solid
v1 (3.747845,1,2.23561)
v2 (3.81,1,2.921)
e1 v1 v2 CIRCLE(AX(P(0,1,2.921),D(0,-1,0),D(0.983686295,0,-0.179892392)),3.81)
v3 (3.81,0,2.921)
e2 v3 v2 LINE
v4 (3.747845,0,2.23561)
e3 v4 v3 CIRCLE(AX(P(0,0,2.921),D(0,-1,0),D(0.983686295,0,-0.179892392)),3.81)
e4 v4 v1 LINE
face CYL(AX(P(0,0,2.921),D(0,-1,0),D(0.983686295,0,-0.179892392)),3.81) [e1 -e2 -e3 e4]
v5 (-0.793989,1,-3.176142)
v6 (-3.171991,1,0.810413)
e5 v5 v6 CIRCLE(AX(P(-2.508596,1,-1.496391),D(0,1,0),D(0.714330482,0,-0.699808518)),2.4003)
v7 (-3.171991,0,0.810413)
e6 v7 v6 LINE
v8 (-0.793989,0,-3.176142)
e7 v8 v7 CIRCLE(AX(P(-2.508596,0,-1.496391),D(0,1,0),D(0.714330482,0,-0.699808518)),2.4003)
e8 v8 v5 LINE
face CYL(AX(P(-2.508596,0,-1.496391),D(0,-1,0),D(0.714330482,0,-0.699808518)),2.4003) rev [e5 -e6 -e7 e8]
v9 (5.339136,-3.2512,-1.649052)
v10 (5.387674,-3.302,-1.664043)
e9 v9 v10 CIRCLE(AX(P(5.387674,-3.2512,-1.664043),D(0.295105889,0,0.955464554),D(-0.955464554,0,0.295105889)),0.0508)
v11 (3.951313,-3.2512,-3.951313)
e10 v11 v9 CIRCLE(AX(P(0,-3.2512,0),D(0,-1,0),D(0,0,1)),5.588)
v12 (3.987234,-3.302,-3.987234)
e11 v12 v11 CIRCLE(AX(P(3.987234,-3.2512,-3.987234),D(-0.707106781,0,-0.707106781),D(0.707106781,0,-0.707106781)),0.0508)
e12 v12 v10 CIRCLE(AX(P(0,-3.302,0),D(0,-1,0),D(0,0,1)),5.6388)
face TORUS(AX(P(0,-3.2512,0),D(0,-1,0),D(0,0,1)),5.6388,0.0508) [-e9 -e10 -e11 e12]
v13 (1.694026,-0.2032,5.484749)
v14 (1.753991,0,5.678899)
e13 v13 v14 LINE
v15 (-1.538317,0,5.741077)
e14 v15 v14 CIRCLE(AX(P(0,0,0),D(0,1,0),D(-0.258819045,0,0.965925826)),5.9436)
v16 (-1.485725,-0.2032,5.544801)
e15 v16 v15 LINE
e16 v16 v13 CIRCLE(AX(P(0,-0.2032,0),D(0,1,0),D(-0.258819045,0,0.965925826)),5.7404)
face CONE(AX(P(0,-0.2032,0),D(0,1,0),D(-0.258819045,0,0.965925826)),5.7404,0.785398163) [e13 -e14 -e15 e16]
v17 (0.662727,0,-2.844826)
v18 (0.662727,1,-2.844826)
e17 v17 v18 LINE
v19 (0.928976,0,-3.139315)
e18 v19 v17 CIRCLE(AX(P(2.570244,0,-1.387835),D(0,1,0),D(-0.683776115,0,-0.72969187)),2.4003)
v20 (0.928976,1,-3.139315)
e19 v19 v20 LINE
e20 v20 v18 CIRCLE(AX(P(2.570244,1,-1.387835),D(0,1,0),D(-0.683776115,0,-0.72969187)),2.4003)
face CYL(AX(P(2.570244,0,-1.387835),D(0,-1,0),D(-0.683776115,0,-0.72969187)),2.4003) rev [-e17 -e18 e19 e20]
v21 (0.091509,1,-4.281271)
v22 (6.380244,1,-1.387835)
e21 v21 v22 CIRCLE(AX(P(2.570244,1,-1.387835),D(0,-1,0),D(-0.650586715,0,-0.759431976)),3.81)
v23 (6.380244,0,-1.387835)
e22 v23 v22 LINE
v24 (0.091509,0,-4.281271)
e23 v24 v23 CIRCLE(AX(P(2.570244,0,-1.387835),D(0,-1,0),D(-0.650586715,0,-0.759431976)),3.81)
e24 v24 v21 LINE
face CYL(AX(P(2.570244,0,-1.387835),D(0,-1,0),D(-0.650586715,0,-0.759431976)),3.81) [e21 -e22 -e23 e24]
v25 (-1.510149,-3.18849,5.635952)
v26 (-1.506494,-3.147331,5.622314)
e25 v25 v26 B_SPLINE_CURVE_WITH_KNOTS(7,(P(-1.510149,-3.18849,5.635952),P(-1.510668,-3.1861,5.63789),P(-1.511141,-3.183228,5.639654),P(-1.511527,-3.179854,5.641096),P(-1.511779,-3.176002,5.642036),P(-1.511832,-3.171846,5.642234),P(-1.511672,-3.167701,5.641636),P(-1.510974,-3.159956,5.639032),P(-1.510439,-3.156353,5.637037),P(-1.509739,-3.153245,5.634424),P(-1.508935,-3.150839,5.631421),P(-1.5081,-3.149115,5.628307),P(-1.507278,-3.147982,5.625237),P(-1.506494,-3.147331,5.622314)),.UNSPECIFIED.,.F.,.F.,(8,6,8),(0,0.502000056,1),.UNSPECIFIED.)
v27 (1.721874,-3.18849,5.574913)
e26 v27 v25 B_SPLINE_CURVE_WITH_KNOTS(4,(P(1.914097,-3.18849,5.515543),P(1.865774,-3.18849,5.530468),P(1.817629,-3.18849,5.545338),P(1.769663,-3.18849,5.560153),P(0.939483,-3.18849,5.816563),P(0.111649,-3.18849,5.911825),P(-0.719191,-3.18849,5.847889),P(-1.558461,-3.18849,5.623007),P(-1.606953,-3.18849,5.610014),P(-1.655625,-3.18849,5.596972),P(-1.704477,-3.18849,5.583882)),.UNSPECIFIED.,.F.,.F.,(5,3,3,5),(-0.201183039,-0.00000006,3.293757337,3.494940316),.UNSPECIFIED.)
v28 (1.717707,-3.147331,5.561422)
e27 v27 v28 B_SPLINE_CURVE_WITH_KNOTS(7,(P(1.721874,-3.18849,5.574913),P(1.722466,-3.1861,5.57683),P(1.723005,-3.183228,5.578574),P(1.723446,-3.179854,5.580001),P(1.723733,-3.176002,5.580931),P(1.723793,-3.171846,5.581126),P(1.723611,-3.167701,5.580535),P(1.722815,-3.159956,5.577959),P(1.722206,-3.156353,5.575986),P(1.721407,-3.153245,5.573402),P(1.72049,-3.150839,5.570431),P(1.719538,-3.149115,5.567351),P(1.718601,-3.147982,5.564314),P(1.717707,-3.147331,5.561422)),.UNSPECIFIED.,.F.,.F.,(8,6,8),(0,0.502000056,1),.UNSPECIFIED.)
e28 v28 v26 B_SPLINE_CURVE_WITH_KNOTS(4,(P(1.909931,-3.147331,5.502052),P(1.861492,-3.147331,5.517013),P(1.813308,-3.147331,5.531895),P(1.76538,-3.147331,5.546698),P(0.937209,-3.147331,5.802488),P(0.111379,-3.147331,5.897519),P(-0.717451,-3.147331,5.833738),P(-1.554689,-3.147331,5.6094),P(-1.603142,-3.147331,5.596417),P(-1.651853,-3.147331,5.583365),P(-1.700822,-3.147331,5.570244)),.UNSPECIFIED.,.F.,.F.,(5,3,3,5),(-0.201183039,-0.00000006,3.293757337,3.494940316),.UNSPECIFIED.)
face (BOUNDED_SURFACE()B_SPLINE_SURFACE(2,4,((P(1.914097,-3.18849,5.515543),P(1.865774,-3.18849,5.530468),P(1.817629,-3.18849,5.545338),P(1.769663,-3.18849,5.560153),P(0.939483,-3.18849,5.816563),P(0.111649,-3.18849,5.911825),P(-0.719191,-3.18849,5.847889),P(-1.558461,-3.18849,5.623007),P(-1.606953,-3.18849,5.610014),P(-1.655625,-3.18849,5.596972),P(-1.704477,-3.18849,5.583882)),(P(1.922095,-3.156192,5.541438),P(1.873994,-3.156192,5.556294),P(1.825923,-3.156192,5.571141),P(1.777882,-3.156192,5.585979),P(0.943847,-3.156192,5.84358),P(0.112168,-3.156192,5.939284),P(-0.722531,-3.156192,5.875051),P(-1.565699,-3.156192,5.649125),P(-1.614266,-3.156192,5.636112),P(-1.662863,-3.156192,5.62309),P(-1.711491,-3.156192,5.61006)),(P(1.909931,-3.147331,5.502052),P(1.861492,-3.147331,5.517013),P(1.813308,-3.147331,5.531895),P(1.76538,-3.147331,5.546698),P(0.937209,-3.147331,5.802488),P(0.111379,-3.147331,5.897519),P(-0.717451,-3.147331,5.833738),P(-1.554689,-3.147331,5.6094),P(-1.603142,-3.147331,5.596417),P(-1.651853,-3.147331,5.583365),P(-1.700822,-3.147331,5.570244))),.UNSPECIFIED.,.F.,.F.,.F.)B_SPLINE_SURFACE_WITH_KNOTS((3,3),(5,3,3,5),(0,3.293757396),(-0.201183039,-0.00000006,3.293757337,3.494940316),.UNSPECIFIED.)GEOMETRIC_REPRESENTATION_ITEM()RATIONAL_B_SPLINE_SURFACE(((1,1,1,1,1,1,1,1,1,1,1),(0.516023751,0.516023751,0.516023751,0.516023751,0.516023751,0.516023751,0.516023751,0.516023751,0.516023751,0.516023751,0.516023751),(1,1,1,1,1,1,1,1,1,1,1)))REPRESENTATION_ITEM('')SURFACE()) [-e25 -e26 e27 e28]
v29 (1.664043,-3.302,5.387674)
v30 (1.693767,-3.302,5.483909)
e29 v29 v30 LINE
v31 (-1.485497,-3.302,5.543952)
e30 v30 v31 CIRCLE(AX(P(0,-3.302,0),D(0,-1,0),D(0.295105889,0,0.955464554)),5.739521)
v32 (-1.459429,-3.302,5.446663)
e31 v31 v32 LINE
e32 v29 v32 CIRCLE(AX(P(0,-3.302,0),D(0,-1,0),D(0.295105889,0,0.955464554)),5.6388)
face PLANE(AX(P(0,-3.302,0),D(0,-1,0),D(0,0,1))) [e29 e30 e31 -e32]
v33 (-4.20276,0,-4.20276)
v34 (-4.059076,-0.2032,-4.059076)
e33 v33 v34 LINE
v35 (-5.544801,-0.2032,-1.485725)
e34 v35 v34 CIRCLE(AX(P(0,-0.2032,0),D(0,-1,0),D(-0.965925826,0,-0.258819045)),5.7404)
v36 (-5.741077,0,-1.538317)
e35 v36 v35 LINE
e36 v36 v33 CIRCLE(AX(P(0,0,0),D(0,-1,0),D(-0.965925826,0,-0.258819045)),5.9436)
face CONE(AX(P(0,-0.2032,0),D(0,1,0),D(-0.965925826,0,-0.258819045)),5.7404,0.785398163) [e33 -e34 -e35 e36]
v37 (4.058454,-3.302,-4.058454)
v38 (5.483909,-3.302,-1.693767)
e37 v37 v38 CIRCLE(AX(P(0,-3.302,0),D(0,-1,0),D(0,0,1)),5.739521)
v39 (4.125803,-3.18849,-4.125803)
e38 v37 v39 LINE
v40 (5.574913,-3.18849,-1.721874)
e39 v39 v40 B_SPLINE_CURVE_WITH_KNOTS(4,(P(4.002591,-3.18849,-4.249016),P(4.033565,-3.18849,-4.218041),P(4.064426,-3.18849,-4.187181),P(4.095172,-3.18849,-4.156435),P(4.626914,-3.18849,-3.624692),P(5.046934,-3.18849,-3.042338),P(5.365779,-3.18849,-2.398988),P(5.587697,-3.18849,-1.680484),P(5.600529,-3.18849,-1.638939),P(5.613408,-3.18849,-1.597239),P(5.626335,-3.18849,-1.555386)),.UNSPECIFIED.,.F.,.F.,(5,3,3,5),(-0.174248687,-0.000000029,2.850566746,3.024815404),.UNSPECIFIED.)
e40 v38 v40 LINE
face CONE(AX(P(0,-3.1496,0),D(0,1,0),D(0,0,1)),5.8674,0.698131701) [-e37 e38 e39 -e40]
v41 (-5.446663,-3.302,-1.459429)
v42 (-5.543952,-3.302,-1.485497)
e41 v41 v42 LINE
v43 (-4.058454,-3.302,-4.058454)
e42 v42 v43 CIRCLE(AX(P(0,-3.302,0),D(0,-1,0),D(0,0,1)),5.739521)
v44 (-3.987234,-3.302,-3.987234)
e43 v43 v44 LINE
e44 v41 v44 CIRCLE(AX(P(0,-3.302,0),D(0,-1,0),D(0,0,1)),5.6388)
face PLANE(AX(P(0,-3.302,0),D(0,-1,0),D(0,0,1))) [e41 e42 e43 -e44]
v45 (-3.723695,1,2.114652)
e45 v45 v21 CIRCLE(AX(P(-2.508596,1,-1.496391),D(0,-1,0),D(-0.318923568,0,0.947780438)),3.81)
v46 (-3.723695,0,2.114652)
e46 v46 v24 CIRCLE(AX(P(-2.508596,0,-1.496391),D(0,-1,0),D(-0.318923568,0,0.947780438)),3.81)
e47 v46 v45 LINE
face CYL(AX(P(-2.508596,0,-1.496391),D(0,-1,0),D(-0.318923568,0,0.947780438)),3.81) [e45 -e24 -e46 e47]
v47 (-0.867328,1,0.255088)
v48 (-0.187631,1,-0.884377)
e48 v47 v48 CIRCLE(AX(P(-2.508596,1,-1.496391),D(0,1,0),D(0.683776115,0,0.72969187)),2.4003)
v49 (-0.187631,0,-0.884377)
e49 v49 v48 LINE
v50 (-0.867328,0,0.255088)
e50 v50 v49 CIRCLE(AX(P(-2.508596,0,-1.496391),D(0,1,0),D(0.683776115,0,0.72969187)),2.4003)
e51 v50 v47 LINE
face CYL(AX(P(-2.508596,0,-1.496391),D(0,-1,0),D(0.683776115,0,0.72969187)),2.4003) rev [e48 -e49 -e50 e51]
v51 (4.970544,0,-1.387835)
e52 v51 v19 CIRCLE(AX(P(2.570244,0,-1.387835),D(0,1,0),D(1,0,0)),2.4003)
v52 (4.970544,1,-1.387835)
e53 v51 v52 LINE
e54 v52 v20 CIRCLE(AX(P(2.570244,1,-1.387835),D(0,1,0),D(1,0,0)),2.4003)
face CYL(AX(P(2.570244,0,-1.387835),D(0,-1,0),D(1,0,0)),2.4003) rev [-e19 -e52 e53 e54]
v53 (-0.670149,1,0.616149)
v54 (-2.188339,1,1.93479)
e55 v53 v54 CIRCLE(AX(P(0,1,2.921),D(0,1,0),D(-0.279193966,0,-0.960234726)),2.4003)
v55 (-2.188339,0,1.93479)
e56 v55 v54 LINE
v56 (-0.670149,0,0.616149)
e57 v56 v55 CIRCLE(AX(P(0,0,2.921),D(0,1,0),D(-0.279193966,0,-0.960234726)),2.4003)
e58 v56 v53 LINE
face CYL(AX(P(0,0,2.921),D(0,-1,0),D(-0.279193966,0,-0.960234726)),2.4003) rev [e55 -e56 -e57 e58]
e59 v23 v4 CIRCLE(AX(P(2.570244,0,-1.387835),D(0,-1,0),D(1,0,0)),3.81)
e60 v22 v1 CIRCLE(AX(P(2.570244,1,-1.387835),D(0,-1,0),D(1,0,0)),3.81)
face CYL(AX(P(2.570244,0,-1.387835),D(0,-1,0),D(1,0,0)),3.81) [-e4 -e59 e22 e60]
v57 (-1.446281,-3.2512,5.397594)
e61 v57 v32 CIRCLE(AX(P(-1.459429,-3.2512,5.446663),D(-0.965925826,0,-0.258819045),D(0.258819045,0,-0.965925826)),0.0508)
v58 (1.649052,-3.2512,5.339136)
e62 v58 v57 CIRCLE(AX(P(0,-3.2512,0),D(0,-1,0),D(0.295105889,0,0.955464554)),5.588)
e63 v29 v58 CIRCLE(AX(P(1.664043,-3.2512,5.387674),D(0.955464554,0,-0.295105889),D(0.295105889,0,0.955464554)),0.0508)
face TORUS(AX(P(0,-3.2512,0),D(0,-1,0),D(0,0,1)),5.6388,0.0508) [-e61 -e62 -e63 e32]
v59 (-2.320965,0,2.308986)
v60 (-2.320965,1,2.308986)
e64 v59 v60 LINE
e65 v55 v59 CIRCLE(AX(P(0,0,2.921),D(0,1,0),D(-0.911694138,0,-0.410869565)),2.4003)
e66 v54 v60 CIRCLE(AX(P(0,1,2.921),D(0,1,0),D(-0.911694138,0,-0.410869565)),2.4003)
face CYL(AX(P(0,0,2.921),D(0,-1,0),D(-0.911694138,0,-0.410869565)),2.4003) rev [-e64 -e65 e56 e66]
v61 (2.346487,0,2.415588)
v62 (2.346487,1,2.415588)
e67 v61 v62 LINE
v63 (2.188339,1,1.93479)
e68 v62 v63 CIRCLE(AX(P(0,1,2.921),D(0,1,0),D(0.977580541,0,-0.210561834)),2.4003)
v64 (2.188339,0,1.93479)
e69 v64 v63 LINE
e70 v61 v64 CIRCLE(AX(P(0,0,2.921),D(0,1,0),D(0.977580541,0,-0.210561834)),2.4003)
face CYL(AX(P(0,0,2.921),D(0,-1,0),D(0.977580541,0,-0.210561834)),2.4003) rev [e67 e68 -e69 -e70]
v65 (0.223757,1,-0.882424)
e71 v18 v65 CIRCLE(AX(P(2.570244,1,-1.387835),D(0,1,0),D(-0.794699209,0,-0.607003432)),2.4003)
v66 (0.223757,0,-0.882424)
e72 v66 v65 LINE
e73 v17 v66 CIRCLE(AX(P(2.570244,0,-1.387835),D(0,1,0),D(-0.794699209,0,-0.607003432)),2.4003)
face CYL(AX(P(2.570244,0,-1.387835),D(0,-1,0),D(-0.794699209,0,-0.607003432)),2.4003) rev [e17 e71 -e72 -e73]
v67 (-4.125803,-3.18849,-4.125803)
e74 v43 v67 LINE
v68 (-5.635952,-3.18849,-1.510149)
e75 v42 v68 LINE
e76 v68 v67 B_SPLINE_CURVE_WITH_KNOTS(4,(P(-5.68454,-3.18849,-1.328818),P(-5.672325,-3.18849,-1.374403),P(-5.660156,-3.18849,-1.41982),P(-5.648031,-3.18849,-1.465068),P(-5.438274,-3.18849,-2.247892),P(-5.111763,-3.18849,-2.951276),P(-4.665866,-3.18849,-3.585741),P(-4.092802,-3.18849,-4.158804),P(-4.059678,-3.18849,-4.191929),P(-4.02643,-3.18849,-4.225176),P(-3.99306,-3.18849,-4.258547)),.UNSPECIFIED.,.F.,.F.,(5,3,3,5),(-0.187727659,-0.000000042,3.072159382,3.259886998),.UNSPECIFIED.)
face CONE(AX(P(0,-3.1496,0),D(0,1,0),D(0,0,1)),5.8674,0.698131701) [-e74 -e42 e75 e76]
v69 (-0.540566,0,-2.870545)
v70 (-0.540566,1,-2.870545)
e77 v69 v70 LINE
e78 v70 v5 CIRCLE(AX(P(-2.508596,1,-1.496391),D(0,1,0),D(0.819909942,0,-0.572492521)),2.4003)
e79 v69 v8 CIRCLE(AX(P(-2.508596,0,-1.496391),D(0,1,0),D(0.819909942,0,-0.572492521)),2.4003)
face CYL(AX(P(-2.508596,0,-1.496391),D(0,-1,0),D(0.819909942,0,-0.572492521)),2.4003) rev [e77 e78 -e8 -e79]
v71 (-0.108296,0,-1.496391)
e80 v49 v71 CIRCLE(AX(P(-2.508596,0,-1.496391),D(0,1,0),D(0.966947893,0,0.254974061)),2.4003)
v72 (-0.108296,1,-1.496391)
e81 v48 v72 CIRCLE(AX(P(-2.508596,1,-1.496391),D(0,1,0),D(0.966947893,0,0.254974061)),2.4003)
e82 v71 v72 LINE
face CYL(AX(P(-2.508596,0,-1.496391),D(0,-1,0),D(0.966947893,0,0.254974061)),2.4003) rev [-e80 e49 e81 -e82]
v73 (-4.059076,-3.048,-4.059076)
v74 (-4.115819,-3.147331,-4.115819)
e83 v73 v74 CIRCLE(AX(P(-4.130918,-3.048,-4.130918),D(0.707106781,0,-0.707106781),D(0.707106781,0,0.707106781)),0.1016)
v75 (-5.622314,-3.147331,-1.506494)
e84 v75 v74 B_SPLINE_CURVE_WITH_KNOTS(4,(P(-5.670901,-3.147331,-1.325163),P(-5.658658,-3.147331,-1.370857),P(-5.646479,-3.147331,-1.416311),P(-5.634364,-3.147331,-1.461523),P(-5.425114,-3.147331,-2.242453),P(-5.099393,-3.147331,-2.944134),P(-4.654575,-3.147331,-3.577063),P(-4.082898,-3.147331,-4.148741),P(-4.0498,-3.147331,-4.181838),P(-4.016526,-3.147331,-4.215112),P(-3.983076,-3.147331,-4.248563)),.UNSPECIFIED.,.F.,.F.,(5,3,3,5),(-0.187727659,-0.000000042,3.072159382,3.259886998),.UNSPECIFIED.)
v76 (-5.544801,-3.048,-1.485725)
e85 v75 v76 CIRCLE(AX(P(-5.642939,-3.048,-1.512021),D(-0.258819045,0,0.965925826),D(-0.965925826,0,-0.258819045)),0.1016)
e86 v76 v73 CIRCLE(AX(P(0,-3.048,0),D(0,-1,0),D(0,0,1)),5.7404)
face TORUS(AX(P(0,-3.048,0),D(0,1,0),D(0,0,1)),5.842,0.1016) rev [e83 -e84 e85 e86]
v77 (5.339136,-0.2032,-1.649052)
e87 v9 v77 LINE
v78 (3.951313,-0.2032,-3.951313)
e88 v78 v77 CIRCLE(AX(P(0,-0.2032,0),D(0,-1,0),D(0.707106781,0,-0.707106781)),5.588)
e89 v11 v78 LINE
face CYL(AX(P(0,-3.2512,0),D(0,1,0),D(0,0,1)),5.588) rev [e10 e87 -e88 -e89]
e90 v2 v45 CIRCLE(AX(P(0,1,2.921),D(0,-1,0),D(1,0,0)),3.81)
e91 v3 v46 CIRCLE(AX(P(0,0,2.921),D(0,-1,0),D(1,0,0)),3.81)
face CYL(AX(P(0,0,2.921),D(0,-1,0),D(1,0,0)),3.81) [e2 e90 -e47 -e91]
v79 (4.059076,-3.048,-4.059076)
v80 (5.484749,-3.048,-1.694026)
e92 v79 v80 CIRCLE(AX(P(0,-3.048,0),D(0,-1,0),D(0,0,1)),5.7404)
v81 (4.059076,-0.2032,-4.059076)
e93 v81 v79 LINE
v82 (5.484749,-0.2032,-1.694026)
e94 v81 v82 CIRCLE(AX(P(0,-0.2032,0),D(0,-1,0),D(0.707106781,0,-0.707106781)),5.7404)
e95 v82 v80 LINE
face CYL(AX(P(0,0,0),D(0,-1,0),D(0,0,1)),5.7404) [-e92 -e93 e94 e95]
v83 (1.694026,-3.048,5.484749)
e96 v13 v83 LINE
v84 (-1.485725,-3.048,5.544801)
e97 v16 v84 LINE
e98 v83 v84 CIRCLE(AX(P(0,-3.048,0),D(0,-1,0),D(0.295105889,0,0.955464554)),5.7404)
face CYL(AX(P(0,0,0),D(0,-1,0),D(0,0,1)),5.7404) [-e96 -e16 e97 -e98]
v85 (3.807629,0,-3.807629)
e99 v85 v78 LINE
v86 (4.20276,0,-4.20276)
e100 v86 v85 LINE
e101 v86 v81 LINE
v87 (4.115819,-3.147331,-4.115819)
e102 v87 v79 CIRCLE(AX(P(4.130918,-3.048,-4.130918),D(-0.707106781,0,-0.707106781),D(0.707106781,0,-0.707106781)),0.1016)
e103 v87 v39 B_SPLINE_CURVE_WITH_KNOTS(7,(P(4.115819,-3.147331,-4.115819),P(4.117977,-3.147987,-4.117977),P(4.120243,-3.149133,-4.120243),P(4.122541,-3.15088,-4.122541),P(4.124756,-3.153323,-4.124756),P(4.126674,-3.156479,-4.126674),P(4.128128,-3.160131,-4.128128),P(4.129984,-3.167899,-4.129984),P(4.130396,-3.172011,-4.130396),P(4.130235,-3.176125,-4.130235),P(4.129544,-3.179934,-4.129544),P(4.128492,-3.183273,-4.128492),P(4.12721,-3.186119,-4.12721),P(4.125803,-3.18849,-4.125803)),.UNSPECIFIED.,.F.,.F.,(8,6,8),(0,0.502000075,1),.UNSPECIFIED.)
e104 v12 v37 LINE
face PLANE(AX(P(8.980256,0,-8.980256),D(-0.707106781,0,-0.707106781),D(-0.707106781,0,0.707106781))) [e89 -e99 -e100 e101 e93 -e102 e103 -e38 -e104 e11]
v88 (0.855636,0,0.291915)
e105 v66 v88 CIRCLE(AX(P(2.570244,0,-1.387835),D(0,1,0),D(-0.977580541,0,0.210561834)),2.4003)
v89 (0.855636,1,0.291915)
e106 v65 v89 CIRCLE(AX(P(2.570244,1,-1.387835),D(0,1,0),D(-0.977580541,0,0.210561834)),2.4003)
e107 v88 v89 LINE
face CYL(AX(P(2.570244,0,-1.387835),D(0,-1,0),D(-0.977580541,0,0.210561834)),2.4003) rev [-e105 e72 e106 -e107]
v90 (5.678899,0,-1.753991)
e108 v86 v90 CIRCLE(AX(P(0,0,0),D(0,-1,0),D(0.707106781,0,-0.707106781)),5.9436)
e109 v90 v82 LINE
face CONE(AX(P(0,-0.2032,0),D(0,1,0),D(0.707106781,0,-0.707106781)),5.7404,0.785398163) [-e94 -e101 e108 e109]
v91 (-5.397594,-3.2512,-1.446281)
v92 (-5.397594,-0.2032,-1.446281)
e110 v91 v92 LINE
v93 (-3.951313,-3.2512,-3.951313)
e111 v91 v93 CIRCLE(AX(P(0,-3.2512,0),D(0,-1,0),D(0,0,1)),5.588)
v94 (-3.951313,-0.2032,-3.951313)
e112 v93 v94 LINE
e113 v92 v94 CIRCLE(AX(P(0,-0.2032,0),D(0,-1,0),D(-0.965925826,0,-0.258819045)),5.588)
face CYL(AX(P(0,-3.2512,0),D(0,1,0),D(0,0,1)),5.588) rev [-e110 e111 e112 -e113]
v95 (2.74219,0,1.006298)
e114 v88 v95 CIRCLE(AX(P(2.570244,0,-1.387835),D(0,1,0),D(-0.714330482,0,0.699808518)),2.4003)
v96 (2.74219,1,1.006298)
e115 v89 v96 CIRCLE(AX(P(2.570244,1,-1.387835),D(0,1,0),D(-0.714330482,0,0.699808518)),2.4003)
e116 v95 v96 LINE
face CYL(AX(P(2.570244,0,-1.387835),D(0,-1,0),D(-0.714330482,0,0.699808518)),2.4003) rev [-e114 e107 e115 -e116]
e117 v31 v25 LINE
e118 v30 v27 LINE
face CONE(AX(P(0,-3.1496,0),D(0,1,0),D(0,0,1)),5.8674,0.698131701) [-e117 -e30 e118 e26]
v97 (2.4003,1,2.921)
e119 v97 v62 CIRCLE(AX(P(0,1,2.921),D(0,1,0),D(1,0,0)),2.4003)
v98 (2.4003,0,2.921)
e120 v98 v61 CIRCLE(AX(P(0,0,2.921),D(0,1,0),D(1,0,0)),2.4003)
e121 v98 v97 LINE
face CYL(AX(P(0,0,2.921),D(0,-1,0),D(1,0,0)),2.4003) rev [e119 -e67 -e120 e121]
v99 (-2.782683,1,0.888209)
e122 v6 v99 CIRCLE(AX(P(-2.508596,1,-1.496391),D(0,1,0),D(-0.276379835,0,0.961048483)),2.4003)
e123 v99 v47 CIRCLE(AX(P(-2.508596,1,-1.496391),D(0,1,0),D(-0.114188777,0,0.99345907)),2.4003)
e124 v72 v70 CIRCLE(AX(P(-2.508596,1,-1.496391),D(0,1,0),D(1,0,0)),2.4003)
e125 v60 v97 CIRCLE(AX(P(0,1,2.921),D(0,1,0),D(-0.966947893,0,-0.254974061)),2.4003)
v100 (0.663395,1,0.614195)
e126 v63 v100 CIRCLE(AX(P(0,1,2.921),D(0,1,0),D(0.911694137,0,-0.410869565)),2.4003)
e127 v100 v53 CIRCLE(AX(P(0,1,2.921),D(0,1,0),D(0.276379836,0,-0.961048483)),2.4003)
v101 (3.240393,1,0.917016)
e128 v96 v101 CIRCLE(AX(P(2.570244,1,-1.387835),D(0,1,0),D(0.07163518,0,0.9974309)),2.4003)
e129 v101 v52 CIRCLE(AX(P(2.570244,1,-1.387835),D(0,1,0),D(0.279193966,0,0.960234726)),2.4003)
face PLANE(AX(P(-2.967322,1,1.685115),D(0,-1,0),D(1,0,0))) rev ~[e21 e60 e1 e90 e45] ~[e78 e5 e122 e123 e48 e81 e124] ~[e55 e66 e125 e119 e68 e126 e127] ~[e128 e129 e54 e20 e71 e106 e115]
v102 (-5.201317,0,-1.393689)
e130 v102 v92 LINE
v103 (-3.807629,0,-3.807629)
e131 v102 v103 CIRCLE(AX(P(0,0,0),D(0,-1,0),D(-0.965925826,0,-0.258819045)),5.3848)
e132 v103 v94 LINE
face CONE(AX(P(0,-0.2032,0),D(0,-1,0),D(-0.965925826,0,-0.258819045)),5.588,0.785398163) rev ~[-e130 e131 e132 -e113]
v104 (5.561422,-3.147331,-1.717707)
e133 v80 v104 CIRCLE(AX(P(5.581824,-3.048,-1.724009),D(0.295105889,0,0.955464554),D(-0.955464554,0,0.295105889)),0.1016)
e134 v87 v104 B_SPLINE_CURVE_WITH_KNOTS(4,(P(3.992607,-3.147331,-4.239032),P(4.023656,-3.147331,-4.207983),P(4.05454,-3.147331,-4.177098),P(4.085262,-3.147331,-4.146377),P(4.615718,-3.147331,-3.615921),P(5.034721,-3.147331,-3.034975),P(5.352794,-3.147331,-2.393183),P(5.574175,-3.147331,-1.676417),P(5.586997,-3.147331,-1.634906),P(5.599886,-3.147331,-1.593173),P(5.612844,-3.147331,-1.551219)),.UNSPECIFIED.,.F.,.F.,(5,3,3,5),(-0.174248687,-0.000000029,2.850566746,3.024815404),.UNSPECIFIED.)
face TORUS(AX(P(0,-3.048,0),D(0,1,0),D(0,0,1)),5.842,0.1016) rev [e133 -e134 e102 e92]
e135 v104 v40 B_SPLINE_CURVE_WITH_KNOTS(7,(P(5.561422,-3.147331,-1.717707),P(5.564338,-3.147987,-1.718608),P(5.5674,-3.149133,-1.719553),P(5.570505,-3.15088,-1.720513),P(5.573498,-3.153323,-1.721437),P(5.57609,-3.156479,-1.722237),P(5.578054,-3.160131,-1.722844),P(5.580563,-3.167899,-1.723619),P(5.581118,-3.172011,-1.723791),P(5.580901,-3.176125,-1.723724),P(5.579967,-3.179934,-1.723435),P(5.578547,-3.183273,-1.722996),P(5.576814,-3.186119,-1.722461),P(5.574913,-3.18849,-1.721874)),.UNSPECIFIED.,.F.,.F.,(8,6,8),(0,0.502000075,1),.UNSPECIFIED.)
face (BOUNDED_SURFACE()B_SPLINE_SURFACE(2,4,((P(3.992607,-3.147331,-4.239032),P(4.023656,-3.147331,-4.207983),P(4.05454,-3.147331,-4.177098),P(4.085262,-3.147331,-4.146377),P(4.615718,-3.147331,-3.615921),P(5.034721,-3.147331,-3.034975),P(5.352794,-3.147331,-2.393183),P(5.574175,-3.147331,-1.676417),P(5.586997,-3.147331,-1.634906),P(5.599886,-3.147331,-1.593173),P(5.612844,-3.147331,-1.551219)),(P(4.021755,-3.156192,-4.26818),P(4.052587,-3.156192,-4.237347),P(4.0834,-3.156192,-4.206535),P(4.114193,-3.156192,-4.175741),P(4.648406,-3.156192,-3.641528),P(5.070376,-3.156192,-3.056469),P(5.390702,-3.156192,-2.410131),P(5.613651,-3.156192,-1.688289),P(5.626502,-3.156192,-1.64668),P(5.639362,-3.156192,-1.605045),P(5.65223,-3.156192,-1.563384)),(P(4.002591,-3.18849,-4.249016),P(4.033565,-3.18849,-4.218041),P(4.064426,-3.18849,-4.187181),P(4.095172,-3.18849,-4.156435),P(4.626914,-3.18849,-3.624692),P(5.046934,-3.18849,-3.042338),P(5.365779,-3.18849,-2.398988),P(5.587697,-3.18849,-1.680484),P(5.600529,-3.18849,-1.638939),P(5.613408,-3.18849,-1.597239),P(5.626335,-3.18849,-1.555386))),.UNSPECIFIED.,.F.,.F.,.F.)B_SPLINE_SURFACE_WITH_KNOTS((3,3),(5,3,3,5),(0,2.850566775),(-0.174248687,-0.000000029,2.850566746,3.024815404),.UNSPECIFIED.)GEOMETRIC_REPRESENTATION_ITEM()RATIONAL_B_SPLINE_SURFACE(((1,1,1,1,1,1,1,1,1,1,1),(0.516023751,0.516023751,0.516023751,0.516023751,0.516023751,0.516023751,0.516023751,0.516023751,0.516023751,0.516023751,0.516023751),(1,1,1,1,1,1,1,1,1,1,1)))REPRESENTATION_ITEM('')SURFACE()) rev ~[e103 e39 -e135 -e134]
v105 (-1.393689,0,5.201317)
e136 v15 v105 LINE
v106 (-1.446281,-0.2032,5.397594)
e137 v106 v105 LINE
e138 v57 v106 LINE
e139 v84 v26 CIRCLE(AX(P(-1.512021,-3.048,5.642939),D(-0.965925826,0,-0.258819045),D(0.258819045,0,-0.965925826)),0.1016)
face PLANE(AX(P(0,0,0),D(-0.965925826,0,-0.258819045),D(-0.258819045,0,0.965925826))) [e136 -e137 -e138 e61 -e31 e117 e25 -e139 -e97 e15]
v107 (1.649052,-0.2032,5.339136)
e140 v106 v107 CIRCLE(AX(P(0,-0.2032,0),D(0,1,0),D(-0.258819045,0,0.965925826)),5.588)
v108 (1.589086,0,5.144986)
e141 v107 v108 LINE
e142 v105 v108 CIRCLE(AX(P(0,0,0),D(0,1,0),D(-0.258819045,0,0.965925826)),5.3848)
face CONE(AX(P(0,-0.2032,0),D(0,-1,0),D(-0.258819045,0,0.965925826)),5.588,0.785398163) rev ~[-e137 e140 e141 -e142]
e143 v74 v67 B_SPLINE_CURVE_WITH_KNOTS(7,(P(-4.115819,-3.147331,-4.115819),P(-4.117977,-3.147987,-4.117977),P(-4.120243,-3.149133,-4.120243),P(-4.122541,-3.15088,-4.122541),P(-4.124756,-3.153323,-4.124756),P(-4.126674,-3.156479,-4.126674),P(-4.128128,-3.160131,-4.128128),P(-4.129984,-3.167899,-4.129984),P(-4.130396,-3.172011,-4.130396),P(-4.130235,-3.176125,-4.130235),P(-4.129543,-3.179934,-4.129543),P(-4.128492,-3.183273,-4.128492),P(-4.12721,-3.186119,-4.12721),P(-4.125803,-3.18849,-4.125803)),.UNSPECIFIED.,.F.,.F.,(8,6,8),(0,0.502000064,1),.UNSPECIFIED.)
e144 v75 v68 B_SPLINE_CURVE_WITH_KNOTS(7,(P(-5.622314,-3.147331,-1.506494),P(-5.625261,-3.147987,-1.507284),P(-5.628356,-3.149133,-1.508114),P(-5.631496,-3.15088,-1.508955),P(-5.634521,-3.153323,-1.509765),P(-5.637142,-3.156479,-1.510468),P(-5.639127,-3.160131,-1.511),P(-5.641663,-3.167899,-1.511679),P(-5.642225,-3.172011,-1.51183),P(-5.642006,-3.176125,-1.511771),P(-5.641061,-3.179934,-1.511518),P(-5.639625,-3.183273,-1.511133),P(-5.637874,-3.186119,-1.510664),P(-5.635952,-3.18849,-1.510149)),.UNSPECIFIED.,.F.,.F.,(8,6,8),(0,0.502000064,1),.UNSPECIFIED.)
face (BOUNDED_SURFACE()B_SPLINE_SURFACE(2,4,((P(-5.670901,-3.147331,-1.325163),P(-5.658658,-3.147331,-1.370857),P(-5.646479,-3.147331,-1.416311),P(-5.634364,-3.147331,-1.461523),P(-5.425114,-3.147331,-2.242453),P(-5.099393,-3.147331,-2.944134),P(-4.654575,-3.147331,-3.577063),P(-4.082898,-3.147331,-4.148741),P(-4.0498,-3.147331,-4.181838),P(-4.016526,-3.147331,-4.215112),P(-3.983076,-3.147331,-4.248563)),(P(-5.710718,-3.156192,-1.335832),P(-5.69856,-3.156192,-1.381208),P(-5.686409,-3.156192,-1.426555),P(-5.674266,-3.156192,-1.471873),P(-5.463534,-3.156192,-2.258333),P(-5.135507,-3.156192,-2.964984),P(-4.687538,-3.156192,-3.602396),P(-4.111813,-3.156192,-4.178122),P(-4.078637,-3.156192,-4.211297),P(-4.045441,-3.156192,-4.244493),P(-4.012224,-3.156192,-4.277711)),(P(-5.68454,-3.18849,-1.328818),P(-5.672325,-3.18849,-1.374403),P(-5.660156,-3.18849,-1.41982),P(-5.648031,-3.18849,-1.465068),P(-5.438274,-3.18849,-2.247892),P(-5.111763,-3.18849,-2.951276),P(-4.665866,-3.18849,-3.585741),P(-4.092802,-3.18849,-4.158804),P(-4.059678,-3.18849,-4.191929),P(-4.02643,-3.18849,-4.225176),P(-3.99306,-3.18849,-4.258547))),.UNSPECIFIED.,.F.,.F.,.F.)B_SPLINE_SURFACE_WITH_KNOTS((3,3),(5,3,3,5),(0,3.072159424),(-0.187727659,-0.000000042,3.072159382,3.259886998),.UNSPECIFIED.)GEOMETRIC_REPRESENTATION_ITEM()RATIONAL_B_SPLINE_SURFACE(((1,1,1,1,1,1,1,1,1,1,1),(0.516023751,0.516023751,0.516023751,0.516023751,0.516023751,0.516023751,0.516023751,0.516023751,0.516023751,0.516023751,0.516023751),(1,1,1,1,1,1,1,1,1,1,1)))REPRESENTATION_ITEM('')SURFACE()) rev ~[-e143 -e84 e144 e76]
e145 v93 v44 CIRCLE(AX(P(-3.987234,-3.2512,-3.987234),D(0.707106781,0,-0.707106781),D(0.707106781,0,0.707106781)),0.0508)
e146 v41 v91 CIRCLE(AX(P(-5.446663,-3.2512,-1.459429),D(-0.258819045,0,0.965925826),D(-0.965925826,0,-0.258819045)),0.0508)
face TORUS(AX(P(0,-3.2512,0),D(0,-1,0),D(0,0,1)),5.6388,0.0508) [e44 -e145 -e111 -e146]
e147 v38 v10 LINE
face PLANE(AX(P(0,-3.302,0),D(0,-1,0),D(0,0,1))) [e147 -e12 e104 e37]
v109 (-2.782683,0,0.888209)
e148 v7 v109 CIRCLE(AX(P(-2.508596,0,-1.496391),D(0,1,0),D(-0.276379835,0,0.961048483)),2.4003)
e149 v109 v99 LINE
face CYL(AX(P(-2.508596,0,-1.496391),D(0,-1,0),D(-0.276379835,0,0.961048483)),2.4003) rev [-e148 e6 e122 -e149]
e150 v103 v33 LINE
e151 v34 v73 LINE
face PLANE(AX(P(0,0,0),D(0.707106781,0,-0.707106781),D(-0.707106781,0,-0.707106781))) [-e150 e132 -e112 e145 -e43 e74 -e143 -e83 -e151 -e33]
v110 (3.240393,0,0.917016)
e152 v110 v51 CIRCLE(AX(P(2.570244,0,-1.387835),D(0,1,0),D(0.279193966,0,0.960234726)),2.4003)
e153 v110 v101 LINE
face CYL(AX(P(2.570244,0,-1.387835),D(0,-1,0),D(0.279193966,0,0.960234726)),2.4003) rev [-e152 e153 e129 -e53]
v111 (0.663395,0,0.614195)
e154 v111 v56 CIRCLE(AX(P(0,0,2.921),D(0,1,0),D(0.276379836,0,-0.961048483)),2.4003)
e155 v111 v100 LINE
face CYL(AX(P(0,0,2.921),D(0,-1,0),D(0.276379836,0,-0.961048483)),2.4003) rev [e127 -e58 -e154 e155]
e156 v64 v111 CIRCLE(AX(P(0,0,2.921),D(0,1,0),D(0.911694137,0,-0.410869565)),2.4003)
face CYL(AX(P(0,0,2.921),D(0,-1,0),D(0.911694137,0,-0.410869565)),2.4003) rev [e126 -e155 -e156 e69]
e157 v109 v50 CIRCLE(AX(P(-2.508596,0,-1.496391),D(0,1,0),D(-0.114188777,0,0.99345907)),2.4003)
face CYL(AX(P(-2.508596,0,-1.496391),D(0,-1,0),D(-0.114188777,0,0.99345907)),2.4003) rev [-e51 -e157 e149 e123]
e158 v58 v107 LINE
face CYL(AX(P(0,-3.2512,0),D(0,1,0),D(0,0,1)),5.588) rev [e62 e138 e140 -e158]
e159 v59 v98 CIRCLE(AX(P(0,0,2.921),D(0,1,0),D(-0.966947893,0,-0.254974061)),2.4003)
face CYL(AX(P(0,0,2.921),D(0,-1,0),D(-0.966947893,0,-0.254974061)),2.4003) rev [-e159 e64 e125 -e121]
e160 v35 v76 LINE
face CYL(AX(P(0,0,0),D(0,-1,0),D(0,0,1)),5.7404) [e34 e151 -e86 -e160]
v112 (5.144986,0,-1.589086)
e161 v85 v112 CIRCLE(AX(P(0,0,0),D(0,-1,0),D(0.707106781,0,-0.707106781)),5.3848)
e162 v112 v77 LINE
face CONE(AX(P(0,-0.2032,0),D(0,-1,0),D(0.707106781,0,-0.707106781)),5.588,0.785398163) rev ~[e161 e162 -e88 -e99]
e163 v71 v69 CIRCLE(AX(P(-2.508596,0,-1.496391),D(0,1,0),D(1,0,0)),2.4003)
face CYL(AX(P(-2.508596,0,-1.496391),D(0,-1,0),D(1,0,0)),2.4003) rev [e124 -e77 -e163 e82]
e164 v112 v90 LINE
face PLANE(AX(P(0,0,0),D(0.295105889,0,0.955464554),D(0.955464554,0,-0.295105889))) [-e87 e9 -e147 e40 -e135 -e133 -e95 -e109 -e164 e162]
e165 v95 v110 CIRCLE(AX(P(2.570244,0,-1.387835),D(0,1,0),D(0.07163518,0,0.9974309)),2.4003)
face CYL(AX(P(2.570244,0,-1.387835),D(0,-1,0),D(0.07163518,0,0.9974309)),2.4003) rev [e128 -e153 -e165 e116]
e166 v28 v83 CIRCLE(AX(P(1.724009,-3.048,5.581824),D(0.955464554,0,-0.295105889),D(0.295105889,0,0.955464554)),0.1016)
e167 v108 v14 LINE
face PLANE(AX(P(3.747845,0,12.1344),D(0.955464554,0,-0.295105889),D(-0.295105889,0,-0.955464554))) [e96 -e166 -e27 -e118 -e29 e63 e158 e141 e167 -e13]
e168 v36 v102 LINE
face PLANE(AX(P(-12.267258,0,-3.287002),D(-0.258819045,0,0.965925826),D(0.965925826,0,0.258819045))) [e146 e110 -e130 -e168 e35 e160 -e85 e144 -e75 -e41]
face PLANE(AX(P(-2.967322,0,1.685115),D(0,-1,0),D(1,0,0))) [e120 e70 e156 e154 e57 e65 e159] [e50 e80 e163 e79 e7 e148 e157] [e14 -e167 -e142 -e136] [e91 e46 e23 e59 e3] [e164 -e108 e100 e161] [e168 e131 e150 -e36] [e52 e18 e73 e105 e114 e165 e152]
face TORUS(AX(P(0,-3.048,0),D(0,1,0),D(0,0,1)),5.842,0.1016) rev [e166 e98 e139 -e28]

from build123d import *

# Parameters (mm, degrees)
F1_DEPTH = 1
F5_DEPTH = 25.4
F6_SIZE  = 0.2032
F7_R     = 0.0254


with BuildPart() as f1:
    # F0 (on Front) → F1 (new body)
    with BuildSketch(Plane.XZ):
        with BuildLine():
            ThreePointArc((-3.1719905538, 0.8104133692), (-2.9789481059, 0.8573735562), (-2.7826833559, 0.8882085007))
            ThreePointArc((-2.7826833559, 0.8882085007), (-2.54, 1.4424427198), (-2.1883394383, 1.9347897826))
            ThreePointArc((-2.1883394383, 1.9347897826), (-2.2624018983, 2.119141072), (-2.3209650279, 2.3089857605))
            ThreePointArc((-2.3209650279, 2.3089857605), (-3.0314381709, 2.2775636636), (-3.7236948272, 2.1146521631))
            ThreePointArc((-3.7236948272, 2.1146521631), (-3.5089712063, 1.4366748761), (-3.1719905538, 0.8104133692))
        make_face()
        with BuildLine():
            ThreePointArc((-2.7826833559, 0.8882085007), (-1.7552661043, 0.7826291226), (-0.8673282268, 0.2550880913))
            ThreePointArc((-0.8673282268, 0.2550880913), (-0.7736155948, 0.4382816345), (-0.6701492774, 0.616148587))
            ThreePointArc((-0.6701492774, 0.616148587), (-1.5739895442, 1.10881982), (-2.1883394383, 1.9347897826))
            ThreePointArc((-2.1883394383, 1.9347897826), (-2.54, 1.4424427198), (-2.7826833559, 0.8882085007))
        make_face()
        with BuildLine():
            ThreePointArc((0.0915085685, -4.2812712036), (-0.4030364452, -3.7702089133), (-0.7939885782, -3.1761416908))
            ThreePointArc((-0.7939885782, -3.1761416908), (-4.5700075585, -2.7260345936), (-3.1719905538, 0.8104133692))
            ThreePointArc((-3.1719905538, 0.8104133692), (-3.5089712063, 1.4366748761), (-3.7236948272, 2.1146521631))
            ThreePointArc((-3.7236948272, 2.1146521631), (-5.7806778186, -3.4482060491), (0.0915085685, -4.2812712036))
        make_face()
        with BuildLine():
            ThreePointArc((0.6627274406, -2.8448257134), (0.0624196597, -2.9203329923), (-0.5405661999, -2.8705451022))
            ThreePointArc((-0.5405661999, -2.8705451022), (-0.6609484293, -3.028591819), (-0.7939885782, -3.1761416908))
            ThreePointArc((-0.7939885782, -3.1761416908), (-0.4030364452, -3.7702089133), (0.0915085685, -4.2812712036))
            ThreePointArc((0.0915085685, -4.2812712036), (0.5637648419, -3.7495443495), (0.9289761445, -3.1393147701))
            ThreePointArc((0.9289761445, -3.1393147701), (0.7897528718, -2.9975842997), (0.6627274406, -2.8448257134))
        make_face()
        with BuildLine():
            ThreePointArc((0.9289761445, -3.1393147701), (0.5637648419, -3.7495443495), (0.0915085685, -4.2812712036))
            ThreePointArc((0.0915085685, -4.2812712036), (4.1627448452, -4.8490549435), (6.3802439522, -1.3878353744))
            ThreePointArc((6.3802439522, -1.3878353744), (5.6526747439, 0.8515217687), (3.7478447845, 2.235609986))
            ThreePointArc((3.7478447845, 2.235609986), (3.5557756025, 1.5525849076), (3.2403932296, 0.9170160386))
            ThreePointArc((3.2403932296, 0.9170160386), (4.4898792562, 0.0531505345), (4.9705439522, -1.3878353744))
            ThreePointArc((4.9705439522, -1.3878353744), (3.5246822611, -3.590217631), (0.9289761445, -3.1393147701))
        make_face()
        with BuildLine():
            ThreePointArc((-0.1876310066, -0.8843770648), (-0.1282124051, -1.1878238615), (-0.1082960345, -1.4963913043))
            ThreePointArc((-0.1082960345, -1.4963913043), (-0.2189124208, -2.2166614196), (-0.5405661999, -2.8705451022))
            ThreePointArc((-0.5405661999, -2.8705451022), (0.0624196597, -2.9203329923), (0.6627274406, -2.8448257134))
            ThreePointArc((0.6627274406, -2.8448257134), (0.2278326149, -1.9118098174), (0.2237573797, -0.8824238043))
            ThreePointArc((0.2237573797, -0.8824238043), (0.0180895692, -0.8889570559), (-0.1876310066, -0.8843770648))
        make_face()
        with BuildLine():
            ThreePointArc((-0.8673282268, 0.2550880913), (-0.4471845105, -0.2667480151), (-0.1876310066, -0.8843770648))
            ThreePointArc((-0.1876310066, -0.8843770648), (0.0180895692, -0.8889570559), (0.2237573797, -0.8824238043))
            ThreePointArc((0.2237573797, -0.8824238043), (0.4565057727, -0.2504915396), (0.8556364959, 0.2919150121))
            ThreePointArc((0.8556364959, 0.2919150121), (0.7634857496, 0.4554234405), (0.6633945194, 0.6141953265))
            ThreePointArc((0.6633945194, 0.6141953265), (-0.0035157497, 0.5207025748), (-0.6701492774, 0.616148587))
            ThreePointArc((-0.6701492774, 0.616148587), (-0.7736155948, 0.4382816345), (-0.8673282268, 0.2550880913))
        make_face()
        with BuildLine():
            ThreePointArc((2.1883394383, 1.9347897826), (2.5085960345, 1.4963913043), (2.7421898737, 1.0062980158))
            ThreePointArc((2.7421898737, 1.0062980158), (2.9936514378, 0.9748254542), (3.2403932296, 0.9170160386))
            ThreePointArc((3.2403932296, 0.9170160386), (3.5557756025, 1.5525849076), (3.7478447845, 2.235609986))
            ThreePointArc((3.7478447845, 2.235609986), (3.0555813535, 2.3911258065), (2.3464865725, 2.4155884299))
            ThreePointArc((2.3464865725, 2.4155884299), (2.2801213941, 2.1710089879), (2.1883394383, 1.9347897826))
        make_face()
        with BuildLine():
            ThreePointArc((0.6633945194, 0.6141953265), (0.7634857496, 0.4554234405), (0.8556364959, 0.2919150121))
            ThreePointArc((0.8556364959, 0.2919150121), (1.7202222338, 0.8569147606), (2.7421898737, 1.0062980158))
            ThreePointArc((2.7421898737, 1.0062980158), (2.5085960345, 1.4963913043), (2.1883394383, 1.9347897826))
            ThreePointArc((2.1883394383, 1.9347897826), (1.5713335326, 1.1065163216), (0.6633945194, 0.6141953265))
        make_face()
        with BuildLine():
            ThreePointArc((3.81, 2.921), (-0.4054767, 6.7093622643), (-3.7236948272, 2.1146521631))
            ThreePointArc((-3.7236948272, 2.1146521631), (-3.0314381709, 2.2775636636), (-2.3209650279, 2.3089857605))
            ThreePointArc((-2.3209650279, 2.3089857605), (-0.3085674429, 5.3013836294), (2.4003, 2.921))
            ThreePointArc((2.4003, 2.921), (2.3868087282, 2.6668658129), (2.3464865725, 2.4155884299))
            ThreePointArc((2.3464865725, 2.4155884299), (3.0555813535, 2.3911258065), (3.7478447845, 2.235609986))
            ThreePointArc((3.7478447845, 2.235609986), (3.7944293793, 2.5768987278), (3.81, 2.921))
        make_face()
    extrude(amount=-F1_DEPTH)

    # F2 (on Right) → F3 (revolve)
    with BuildSketch(Plane.YZ):
        with BuildLine():
            Line((-3.2512, 5.588), (0, 5.588))
            Line((0, 5.588), (0, 5.7404))
            Line((0, 5.7404), (-3.048, 5.7404))
            ThreePointArc((-3.048, 5.7404), (-3.119842049, 5.770157951), (-3.1496, 5.842))
            Line((-3.1496, 5.842), (-3.1496, 5.8674))
            Line((-3.1496, 5.8674), (-3.302, 5.7395212162))
            Line((-3.302, 5.7395212162), (-3.302, 5.6388))
            ThreePointArc((-3.302, 5.6388), (-3.2871210245, 5.6028789755), (-3.2512, 5.588))
        make_face()
    revolve(axis=Axis((0, -1.6292430228, 0), (0, -1, 0)))

    # F4 (on face) → F5 (cut)
    with BuildSketch(Plane.XZ):
        Polygon((-3.2870018728, 12.2672579939), (-12.2672579939, -3.2870018728), (0, 0), align=None)
        Polygon((3.7478447845, 12.1343998398), (0, 0), (12.1343998398, -3.7478447845), align=None)
        Polygon((8.9802561211, -8.9802561211), (0, 0), (-8.9802561211, -8.9802561211), align=None)
    extrude(amount=F5_DEPTH, mode=Mode.SUBTRACT)

    # F6
    f6_edges = [f1.edges().sort_by_distance(p)[0] for p in [
        (4.91625, 0, -2.963559),
        (4.78573, 0, -2.88488),
        (-4.971332, 0, -2.8702),
        (-4.83935, 0, -2.794),
        (0.108392, 0, 5.739377),
        (0.105515, 0, 5.587004),
    ]]
    chamfer(f6_edges, length=F6_SIZE)

    # F7
    f7_edges = [f1.edges().sort_by_distance(p)[0] for p in [
        (0.11079, -3.1496, 5.866354),
        (-5.081317, -3.1496, -2.9337),
        (5.025016, -3.1496, -3.029124),
    ]]
    fillet(f7_edges, radius=F7_R)


solid = f1.part
